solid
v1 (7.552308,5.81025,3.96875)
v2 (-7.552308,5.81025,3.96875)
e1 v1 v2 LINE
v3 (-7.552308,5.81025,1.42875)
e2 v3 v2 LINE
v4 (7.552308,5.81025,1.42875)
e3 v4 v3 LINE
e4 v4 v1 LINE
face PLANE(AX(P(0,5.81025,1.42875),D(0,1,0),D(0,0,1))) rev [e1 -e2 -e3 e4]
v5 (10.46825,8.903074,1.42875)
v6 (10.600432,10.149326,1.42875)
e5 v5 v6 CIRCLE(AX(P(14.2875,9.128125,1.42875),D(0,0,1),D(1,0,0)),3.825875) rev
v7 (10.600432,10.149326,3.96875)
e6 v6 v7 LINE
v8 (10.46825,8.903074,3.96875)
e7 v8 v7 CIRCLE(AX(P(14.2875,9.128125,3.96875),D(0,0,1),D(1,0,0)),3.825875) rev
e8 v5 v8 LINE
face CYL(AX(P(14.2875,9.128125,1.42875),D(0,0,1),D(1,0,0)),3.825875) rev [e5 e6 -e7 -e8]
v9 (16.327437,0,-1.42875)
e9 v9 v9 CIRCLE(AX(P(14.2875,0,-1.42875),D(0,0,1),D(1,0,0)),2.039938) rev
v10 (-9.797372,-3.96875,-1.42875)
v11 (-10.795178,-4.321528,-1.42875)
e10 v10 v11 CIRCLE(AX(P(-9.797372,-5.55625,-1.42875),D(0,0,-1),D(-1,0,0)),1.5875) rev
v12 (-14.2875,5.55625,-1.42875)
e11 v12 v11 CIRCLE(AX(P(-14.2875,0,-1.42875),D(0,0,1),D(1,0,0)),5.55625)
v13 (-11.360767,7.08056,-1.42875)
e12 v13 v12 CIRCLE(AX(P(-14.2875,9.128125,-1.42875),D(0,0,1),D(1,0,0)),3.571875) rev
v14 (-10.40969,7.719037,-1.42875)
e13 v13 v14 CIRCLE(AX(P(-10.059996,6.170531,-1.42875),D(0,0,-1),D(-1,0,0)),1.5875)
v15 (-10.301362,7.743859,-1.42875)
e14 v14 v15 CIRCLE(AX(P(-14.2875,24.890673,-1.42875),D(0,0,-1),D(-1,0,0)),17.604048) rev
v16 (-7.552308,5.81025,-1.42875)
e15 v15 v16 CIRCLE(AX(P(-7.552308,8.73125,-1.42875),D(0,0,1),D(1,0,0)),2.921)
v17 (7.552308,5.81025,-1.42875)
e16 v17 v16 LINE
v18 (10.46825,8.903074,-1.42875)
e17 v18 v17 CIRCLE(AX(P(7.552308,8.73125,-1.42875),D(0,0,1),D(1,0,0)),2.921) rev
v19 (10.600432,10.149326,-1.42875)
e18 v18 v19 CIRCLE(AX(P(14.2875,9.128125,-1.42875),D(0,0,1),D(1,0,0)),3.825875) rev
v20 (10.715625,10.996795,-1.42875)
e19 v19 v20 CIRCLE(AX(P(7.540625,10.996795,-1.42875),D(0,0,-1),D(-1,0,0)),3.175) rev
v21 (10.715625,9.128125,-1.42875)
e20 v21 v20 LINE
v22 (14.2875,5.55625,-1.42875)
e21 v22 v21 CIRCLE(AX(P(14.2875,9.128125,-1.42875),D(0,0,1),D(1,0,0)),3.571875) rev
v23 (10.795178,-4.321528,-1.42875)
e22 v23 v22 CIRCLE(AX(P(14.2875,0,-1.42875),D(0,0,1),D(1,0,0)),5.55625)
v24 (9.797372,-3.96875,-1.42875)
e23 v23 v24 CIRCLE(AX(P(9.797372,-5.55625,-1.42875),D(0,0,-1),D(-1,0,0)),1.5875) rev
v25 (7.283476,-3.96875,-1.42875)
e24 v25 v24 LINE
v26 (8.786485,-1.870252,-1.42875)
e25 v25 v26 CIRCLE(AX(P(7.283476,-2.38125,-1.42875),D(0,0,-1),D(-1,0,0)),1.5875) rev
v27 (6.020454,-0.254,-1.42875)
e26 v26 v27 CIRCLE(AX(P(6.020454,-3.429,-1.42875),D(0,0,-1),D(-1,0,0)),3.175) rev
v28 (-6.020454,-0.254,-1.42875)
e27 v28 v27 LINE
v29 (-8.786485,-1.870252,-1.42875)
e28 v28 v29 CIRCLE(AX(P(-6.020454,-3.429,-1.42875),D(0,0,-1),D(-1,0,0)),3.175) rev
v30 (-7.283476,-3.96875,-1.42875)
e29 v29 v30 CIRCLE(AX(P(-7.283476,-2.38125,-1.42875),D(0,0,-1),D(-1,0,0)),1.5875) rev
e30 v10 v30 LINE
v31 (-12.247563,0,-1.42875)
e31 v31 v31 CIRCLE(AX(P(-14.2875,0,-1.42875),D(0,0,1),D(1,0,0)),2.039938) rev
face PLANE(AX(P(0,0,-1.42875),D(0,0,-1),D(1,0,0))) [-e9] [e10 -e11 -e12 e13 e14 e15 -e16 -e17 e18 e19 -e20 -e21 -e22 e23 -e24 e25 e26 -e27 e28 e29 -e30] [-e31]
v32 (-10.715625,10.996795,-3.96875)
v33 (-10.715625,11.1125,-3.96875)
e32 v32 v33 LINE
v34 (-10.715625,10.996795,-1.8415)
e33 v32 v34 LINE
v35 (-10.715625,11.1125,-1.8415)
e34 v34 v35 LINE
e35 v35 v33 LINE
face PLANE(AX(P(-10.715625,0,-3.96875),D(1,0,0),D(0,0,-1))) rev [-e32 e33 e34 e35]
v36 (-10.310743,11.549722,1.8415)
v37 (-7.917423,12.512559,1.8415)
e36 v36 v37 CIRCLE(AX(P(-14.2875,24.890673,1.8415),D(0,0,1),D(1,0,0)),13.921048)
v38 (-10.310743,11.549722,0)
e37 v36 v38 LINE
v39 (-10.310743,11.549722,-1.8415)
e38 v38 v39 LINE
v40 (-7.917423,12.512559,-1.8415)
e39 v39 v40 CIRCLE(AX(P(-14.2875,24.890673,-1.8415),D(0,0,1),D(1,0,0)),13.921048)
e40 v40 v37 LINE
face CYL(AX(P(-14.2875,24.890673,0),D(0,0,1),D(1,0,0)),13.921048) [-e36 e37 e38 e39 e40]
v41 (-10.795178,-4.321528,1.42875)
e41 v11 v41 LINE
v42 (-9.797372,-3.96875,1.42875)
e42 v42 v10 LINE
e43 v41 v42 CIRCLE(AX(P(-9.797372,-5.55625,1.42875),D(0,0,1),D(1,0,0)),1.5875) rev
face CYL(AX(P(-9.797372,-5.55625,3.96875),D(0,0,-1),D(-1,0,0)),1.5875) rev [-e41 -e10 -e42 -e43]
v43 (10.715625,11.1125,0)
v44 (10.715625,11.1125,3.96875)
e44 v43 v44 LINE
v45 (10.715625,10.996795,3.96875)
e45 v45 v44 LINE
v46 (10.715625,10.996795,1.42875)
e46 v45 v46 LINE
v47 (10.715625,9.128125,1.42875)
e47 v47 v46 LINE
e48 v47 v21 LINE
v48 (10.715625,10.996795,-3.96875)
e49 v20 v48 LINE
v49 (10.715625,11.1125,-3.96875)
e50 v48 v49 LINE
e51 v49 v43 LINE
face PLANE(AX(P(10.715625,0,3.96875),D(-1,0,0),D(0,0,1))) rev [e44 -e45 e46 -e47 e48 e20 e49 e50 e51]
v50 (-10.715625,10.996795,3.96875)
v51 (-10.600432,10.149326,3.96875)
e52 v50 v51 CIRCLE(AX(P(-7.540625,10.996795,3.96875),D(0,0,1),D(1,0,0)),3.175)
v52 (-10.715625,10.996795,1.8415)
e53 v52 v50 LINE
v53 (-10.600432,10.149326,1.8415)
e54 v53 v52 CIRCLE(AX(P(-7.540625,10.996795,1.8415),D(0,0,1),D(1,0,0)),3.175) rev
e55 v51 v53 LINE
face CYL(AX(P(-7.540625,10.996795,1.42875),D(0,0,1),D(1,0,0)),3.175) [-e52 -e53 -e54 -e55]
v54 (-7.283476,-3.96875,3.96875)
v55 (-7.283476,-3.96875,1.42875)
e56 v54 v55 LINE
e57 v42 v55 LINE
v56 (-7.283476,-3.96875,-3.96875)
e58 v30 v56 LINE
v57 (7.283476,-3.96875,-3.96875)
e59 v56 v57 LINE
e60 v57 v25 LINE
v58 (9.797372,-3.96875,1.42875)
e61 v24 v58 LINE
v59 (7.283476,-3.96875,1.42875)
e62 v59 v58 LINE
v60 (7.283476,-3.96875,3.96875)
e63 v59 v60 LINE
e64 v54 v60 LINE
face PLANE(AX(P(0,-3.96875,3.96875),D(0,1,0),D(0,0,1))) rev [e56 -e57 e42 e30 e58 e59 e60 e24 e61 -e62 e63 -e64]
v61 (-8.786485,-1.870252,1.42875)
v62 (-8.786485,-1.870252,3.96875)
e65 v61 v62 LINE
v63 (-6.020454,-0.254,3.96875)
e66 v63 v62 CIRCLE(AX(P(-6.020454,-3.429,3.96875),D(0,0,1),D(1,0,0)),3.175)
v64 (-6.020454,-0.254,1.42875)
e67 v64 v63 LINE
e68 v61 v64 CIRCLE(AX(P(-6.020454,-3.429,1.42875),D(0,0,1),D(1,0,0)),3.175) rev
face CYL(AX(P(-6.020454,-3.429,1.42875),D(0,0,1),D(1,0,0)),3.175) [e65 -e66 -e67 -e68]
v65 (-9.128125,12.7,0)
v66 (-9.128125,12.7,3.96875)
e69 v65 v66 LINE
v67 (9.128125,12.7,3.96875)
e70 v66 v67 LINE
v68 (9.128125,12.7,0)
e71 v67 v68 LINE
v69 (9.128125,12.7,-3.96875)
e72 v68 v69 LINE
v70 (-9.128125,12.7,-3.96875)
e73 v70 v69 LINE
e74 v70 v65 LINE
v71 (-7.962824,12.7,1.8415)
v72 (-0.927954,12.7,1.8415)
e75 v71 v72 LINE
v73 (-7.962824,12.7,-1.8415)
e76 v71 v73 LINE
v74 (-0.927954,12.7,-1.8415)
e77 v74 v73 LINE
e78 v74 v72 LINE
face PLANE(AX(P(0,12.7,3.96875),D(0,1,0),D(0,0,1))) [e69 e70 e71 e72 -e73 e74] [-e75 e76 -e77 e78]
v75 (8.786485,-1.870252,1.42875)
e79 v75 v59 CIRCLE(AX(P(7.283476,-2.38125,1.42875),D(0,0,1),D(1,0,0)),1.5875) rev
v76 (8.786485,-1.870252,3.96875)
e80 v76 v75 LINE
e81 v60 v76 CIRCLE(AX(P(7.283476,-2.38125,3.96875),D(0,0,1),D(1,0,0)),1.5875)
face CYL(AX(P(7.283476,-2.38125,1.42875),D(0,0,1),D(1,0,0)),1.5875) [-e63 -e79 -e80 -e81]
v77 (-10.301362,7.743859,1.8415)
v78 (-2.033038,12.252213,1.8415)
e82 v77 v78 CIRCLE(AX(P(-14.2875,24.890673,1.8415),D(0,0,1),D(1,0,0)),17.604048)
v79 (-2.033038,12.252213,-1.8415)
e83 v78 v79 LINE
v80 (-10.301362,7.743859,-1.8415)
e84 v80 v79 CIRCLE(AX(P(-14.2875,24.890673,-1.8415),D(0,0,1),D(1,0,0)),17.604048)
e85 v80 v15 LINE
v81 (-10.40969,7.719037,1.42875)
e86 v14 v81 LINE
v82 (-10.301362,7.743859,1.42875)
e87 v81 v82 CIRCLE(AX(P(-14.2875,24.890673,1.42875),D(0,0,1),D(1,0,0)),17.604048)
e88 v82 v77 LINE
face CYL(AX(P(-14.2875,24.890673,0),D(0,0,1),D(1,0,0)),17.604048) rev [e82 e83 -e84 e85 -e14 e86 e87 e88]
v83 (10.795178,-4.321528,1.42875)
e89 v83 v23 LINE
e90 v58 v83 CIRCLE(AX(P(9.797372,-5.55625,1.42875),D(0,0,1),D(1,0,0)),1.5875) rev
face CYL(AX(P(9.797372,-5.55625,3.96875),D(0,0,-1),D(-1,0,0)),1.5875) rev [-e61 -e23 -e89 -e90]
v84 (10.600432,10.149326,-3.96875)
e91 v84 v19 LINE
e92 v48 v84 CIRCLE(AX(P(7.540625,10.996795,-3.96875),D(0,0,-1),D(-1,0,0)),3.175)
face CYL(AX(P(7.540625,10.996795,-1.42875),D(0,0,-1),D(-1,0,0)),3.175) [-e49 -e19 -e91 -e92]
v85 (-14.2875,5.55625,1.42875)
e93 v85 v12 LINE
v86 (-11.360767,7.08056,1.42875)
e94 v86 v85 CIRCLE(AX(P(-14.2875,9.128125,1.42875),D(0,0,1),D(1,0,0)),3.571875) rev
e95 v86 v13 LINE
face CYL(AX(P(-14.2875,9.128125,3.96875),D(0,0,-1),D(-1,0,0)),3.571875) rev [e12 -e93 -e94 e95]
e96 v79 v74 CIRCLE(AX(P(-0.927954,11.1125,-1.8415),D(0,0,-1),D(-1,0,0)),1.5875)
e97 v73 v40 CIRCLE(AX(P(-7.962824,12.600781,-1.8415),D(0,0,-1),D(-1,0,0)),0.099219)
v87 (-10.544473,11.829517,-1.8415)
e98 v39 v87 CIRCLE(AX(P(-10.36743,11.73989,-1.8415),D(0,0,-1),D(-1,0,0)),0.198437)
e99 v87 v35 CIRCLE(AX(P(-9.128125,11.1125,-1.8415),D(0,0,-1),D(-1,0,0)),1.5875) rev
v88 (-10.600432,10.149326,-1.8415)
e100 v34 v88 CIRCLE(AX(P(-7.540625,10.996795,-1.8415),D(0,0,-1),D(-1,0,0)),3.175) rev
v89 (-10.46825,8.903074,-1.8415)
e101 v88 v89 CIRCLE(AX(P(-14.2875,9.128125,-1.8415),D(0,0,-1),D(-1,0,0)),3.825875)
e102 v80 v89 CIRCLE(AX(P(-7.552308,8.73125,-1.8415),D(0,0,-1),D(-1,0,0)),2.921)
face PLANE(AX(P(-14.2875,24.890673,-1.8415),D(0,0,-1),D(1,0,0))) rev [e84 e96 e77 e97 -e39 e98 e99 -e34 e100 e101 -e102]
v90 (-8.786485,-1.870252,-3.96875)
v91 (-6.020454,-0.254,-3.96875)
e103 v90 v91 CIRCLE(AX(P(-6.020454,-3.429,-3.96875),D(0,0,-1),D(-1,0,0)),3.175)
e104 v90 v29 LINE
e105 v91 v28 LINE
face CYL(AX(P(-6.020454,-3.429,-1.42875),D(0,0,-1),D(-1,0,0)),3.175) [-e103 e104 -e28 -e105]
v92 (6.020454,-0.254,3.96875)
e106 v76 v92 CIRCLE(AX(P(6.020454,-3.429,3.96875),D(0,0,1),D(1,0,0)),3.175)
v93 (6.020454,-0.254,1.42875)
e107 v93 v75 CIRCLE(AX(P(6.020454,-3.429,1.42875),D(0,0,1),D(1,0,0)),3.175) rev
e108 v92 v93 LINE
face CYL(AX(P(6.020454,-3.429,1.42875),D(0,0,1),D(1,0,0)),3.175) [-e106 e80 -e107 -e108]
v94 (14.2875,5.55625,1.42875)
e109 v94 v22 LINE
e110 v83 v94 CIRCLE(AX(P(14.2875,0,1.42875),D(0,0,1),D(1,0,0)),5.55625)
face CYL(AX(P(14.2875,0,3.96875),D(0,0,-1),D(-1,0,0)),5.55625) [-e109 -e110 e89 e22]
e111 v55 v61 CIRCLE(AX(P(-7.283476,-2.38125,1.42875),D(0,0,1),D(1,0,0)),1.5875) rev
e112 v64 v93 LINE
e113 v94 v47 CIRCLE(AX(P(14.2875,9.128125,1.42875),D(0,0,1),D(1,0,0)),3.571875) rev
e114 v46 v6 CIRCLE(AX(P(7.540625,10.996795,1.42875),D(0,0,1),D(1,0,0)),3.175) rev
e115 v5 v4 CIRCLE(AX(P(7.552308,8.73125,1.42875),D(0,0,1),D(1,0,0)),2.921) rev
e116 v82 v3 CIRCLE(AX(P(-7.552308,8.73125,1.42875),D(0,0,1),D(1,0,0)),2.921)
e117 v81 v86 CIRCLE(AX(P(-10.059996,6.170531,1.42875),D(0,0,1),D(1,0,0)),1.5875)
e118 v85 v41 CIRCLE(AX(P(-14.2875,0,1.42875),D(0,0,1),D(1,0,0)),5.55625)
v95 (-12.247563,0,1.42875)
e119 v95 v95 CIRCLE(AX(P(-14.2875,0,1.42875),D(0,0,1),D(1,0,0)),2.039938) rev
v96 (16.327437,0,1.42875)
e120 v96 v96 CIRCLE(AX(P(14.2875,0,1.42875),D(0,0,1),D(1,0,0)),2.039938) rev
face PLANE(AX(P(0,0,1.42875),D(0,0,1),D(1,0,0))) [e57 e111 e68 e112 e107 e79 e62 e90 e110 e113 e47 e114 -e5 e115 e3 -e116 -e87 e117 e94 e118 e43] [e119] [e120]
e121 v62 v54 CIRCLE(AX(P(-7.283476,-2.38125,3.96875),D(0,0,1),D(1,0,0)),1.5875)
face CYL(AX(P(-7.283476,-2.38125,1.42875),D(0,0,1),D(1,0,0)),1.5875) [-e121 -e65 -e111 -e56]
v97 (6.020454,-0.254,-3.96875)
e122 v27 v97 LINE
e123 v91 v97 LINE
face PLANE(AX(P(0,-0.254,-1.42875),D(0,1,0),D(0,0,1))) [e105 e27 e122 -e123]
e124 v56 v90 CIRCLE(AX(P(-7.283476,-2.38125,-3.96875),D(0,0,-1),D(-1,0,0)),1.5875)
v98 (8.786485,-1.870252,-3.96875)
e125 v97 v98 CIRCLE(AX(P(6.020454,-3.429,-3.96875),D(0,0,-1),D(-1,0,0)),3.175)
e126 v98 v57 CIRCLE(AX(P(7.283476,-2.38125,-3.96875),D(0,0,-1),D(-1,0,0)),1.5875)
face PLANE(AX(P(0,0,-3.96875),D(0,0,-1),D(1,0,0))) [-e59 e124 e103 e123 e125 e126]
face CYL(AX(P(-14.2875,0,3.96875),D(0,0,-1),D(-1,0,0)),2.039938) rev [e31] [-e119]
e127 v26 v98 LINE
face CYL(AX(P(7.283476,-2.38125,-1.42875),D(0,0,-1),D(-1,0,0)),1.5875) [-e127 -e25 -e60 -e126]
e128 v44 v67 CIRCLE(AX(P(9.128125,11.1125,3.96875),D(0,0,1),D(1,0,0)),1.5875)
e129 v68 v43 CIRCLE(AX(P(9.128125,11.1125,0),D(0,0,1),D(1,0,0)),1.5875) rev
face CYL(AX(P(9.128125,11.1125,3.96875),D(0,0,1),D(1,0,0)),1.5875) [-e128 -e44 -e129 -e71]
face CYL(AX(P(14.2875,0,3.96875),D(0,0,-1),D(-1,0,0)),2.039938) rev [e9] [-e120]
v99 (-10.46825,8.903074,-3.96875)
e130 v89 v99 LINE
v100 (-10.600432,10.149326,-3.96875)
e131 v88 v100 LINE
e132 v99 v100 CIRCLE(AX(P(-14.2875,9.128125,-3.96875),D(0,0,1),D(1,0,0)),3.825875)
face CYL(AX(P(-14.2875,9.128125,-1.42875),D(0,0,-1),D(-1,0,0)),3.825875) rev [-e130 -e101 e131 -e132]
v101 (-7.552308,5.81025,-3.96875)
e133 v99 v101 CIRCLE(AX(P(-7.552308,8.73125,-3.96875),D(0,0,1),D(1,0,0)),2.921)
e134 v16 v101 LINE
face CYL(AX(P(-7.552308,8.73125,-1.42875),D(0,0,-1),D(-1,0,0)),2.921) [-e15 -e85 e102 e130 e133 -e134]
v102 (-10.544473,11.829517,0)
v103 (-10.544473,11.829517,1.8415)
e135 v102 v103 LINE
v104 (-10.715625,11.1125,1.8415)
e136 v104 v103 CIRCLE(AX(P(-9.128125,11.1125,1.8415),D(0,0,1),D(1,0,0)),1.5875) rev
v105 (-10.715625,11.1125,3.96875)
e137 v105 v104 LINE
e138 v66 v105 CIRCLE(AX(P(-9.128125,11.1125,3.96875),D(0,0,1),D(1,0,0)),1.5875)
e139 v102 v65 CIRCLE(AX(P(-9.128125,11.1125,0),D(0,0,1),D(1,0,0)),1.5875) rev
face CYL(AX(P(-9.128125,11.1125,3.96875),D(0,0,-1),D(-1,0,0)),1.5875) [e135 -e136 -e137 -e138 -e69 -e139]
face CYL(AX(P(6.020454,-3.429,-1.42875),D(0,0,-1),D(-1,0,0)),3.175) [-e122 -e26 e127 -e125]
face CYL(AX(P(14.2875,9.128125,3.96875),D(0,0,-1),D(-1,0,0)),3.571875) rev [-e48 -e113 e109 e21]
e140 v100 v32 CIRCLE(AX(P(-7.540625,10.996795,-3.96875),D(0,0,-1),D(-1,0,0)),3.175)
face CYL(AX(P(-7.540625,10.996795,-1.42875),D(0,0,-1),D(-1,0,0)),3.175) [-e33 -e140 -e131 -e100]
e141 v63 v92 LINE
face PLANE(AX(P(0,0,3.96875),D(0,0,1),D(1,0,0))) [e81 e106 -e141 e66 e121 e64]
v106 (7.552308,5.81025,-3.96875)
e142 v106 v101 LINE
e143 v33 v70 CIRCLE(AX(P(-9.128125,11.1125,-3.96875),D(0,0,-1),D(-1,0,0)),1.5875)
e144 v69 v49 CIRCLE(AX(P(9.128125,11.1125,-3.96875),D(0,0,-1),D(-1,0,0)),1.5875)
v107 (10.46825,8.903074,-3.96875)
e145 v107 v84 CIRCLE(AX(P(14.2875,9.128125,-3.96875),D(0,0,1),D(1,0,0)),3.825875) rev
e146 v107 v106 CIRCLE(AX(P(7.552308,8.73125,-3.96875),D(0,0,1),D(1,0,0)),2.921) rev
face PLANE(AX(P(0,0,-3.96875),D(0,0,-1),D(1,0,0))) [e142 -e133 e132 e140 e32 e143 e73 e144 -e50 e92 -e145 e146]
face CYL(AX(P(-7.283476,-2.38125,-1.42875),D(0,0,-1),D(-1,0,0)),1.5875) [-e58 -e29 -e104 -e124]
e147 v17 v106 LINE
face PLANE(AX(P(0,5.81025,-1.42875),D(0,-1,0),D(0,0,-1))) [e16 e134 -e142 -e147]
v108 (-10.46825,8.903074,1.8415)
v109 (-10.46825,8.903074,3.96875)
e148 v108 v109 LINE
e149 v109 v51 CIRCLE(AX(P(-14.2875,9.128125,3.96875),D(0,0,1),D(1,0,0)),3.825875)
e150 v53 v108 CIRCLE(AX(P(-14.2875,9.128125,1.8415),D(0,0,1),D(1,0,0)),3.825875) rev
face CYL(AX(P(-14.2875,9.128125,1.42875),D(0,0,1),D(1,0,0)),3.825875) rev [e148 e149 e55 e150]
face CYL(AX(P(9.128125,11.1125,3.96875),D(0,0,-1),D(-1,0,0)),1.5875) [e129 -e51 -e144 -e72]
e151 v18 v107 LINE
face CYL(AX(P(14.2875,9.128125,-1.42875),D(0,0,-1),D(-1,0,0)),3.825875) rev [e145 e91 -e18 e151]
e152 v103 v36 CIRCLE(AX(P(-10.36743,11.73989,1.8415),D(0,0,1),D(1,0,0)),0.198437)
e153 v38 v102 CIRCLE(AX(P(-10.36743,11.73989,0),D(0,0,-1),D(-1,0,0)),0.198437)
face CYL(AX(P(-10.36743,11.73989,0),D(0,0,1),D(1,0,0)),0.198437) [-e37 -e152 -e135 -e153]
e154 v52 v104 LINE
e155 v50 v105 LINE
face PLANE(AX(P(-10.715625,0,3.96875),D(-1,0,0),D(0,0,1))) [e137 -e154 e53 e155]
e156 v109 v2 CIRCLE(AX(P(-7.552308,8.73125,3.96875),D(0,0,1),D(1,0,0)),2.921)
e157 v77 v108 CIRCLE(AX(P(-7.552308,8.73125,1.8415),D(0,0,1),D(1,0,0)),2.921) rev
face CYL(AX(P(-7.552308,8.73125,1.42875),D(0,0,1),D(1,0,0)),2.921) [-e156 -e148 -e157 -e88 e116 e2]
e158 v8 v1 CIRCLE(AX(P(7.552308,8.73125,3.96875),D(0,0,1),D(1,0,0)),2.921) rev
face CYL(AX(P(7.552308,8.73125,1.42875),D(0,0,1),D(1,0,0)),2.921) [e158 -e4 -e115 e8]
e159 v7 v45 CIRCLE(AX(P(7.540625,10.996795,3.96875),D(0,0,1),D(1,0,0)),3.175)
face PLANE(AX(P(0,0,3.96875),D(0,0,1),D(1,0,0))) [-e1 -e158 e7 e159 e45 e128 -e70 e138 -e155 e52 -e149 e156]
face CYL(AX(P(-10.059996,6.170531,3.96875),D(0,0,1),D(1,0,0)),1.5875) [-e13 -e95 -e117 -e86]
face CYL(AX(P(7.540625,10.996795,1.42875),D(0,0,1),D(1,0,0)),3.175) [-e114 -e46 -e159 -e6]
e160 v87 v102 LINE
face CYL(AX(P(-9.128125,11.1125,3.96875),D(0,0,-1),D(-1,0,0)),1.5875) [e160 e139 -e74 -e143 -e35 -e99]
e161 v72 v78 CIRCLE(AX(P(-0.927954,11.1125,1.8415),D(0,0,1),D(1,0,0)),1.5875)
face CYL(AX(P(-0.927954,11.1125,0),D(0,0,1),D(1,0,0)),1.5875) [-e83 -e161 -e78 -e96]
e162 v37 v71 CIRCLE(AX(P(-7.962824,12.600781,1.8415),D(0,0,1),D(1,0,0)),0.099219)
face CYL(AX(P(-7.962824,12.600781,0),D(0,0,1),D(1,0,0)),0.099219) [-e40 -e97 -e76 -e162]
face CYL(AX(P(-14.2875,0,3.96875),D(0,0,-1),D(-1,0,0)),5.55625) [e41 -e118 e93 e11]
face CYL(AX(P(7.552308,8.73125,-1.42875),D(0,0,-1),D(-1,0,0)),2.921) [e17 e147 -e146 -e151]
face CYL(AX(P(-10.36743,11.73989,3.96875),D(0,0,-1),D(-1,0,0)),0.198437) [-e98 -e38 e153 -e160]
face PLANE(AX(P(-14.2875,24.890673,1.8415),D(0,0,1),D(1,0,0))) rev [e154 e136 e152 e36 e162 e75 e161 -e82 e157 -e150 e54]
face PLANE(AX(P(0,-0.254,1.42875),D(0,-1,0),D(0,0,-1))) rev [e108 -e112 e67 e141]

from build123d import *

# Parameters (mm, degrees)
SKETCH2_R           = 5.556250000000001
SKETCH2_R_2         = 2.039937499999998
BOSS_EXTRUDE1_DEPTH = 3.96875
CUT_EXTRUDE1_START  = -2.54
SKETCH3_R           = 2.039937499999998
CUT_EXTRUDE1_DEPTH  = 2.54
FILLET1_R           = 1.5875
FILLET2_R           = 3.175
CUT_EXTRUDE2_START  = -2.12725
SKETCH4_R           = 17.604048203812315
SKETCH4_R_2         = 13.921048203812312
CUT_EXTRUDE2_DEPTH  = 1.8415
MIRROR1_START       = -3.96875
MIRROR1_DEPTH       = 3.96875
MIRROR1_START_2     = -1.42875
MIRROR1_2_OUTLINE_R = 2.0399375
MIRROR1_2_DEPTH     = 1.42875
MIRROR1_3_DEPTH     = 2.12725
FILLET3_R           = 1.5875
FILLET4_R           = 0.1984375
FILLET5_R           = 0.09921875


with BuildPart() as part:
    # Sketch2 → Boss-Extrude1 (new body)
    # profile 1 of 3: a face of its own
    with BuildSketch(Plane.XY):
        with Locations((-14.2875, 0)):
            Circle(SKETCH2_R)
        with Locations((-14.2875, 0)):
            Circle(SKETCH2_R_2, mode=Mode.SUBTRACT)
    # profile 2 of 3: a face of its own
    with BuildSketch(Plane.XY):
        with Locations((14.2875, 0)):
            Circle(SKETCH2_R)
        with Locations((14.2875, 0)):
            Circle(SKETCH2_R_2, mode=Mode.SUBTRACT)
    # profile 3 of 3: a face of its own
    with BuildSketch(Plane.XY):
        with BuildLine():
            Line((-10.715625, 12.699999999999998), (-10.715625, 9.128124999999997))
            ThreePointArc((-10.715625, 9.128124999999997), (-11.76180296762913, 6.6024279642694665), (-14.28750000475128, 5.556249999999996))
            ThreePointArc((-14.287500004751278, 5.556250000000001), (-10.358637948712076, 3.9288620546475865), (-8.73125, 0))
            ThreePointArc((-8.73125, -1.36e-15), (-9.165110266752894, -2.1524491824952943), (-10.398935033331705, -3.968750000000002))
            Line((-10.398935033331705, -3.9687500000000018), (10.398935033331705, -3.9687500000000018))
            ThreePointArc((10.398935033331703, -3.968750000000001), (9.143412067733138, 2.1000650960402263), (14.287499984624889, 5.556250000000001))
            ThreePointArc((14.287499984624889, 5.556249999999996), (11.761802960513377, 6.60242797138522), (10.715625, 9.128124999999997))
            Line((10.715625, 9.128124999999997), (10.715625, 12.699999999999998))
            Line((10.715625, 12.699999999999998), (0, 12.699999999999998))
            Line((0, 12.699999999999998), (-10.715625, 12.699999999999998))
        make_face()
    extrude(amount=BOSS_EXTRUDE1_DEPTH)

    # Sketch3 → Cut-Extrude1 (cut)
    with BuildSketch(Plane.XY.offset(3.96875).offset(CUT_EXTRUDE1_START)):
        with BuildLine():
            ThreePointArc((-7.552307909198136, 5.810250000000002), (-9.677647571923792, 6.727460510546287), (-10.468249900083975, 8.903073472752357))
            ThreePointArc((-10.468249900083975, 8.903073472752357), (-10.506779246316498, 9.714188220388294), (-10.715624999999989, 10.498901604702587))
            Line((-10.715625, 10.498901604702585), (-10.715625, 9.128124999999997))
            ThreePointArc((-10.715624999999998, 9.128124999999997), (-11.76180296762913, 6.6024279642694665), (-14.28750000475128, 5.556249999999997))
            ThreePointArc((-14.28750000475128, 5.556250000000002), (-19.43158792846333, -2.1000651053569315), (-10.398935033331707, -3.9687500000000058))
            Line((-10.398935033331705, -3.9687500000000018), (-10.043913250562724, -3.9687500000000018))
            ThreePointArc((-10.043913250562714, -3.968750000000039), (-8.931023957684667, -2.251037420968806), (-8.482804567636641, -0.2540000000000033))
            Line((-8.482804567636643, -0.254), (8.482804567636643, -0.254))
            ThreePointArc((8.482804567636641, -0.25399999999999856), (8.93102395768462, -2.2510374209686943), (10.043913250562554, -3.968749999999868))
            Line((10.04391325056251, -3.9687500000000018), (10.398935033331705, -3.9687500000000018))
            ThreePointArc((10.398935033331703, -3.968750000000001), (19.431587932266865, -2.1000650960402254), (14.287499984624894, 5.556250000000003))
            ThreePointArc((14.28749998462489, 5.556249999999997), (11.761802960513378, 6.60242797138522), (10.715625, 9.128124999999997))
            Line((10.715625, 9.128124999999997), (10.715625, 10.498901604702809))
            ThreePointArc((10.715625000000067, 10.498901604702796), (10.506779255556298, 9.71418827999466), (10.468249892987725, 8.903073593179762))
            ThreePointArc((10.468249892987725, 8.90307359317976), (9.6776476133017, 6.727460554434185), (7.552307909198134, 5.810250000000002))
            Line((7.552307909198135, 5.810250000000002), (0, 5.810250000000002))
            Line((0, 5.810250000000002), (-7.552307909198135, 5.810250000000002))
        make_face()
        with Locations((-14.2875, 0)):
            Circle(SKETCH3_R, mode=Mode.SUBTRACT)
        with Locations((14.2875, 0)):
            Circle(SKETCH3_R, mode=Mode.SUBTRACT)
    extrude(amount=CUT_EXTRUDE1_DEPTH, mode=Mode.SUBTRACT)

    # Fillet1
    fillet1_edges = [part.edges().sort_by_distance(p)[0] for p in [
        (-10.715625, 12.699999999999998, 1.984375),
        (10.715625, 12.699999999999998, 1.984375),
        (10.043913250562532, -3.968749999999936, 2.69875),
        (-10.043913250562719, -3.9687500000000204, 2.69875),
    ]]
    fillet(fillet1_edges, radius=FILLET1_R)

    # Fillet2
    # the kernel refuses this fillet: 3.175 mm, written as the material it takes off along each edge
    with BuildSketch(Plane(origin=(10.715625000000033, 10.498901604702802, 1.42875), x_dir=(-0.3129675525717291, -0.9497638185555723, 0), z_dir=(0, 0, 1))) as fillet2_piece_1:
        with BuildLine():
            CenterArc((0.5207906104453346, -3.1713246792527547), FILLET2_R, 92.75711760707199, 15.4810427085975)
            Line((-0.47288136896990385, -0.15582455533881112), (0, 0))
            ThreePointArc((0, 0), (0.1840330456266841, -0.00442876150043089), (0.3680660912533638, 0))
        make_face()
    extrude(amount=3.784734111079021, mode=Mode.SUBTRACT)
    with BuildSketch(Plane(origin=(-10.715624999999994, 10.498901604702585, 1.42875), x_dir=(0.31296755257180836, -0.949763818555546, 0), z_dir=(0, 0, 1))) as fillet2_piece_2:
        with BuildLine():
            CenterArc((0.520790610445383, 3.1713246792527405), FILLET2_R, 251.7618396843257, 15.481042708597613)
            Line((-0.4728813689701088, 0.1558245553388813), (0, 0))
            ThreePointArc((0, 0), (0.18403304562657702, 0.00442876150044717), (0.3680660912531513, -1e-17))
        make_face()
    extrude(amount=3.784734111079562, mode=Mode.SUBTRACT)
    with BuildSketch(Plane(origin=(8.482804567636641, -0.25399999999999934, 1.42875), x_dir=(0.18466066844771437, -0.9828023389921513, 0), z_dir=(0, 0, 1))) as fillet2_piece_3:
        with BuildLine():
            CenterArc((2.665698104684143, -3.006301625224905), FILLET2_R, 108.76131112774725, 60.59733959481885)
            Line((-0.4546993216159375, -2.4200040029034118), (0, 0))
            ThreePointArc((0, 0), (0.8222671445716088, -0.05847794215052012), (1.644534289143218, 1e-17))
        make_face()
    extrude(amount=8.695876687740405, mode=Mode.SUBTRACT)
    with BuildSketch(Plane(origin=(-8.482804567636641, -0.2540000000000016, 1.42875), x_dir=(1, 6.5e-16, 0), z_dir=(0, 0, 1))) as fillet2_piece_4:
        with BuildLine():
            CenterArc((2.462350675096158, -3.175), FILLET2_R, 89.99999999999996, 60.59733959481888)
            ThreePointArc((-0.3036808011183762, -1.6162521459227466), (-0.09436814223421007, -0.8189246488483356), (0, 0))
            Line((0, 0), (2.46235067509616, 0))
        make_face()
    extrude(amount=8.695876687740402, mode=Mode.SUBTRACT)

    # Sketch4 → Cut-Extrude2 (cut)
    with BuildSketch(Plane.XY.offset(3.96875).offset(CUT_EXTRUDE2_START)):
        with Locations((-14.2875, 24.89067320381231)):
            Circle(SKETCH4_R)
        with Locations((-14.2875, 24.89067320381231)):
            Circle(SKETCH4_R_2, mode=Mode.SUBTRACT)
    extrude(amount=-CUT_EXTRUDE2_DEPTH, mode=Mode.SUBTRACT)

    # Mirror1: read off the stored shape, not the designer's step
    # Mirror1 outline → Mirror1 (add)
    with BuildSketch(Plane.XY.offset(MIRROR1_START)):
        with BuildLine():
            ThreePointArc((-1.5875, 12.7), (-5.58418864, 9.588552941), (-10.301362468, 7.743859484))
            ThreePointArc((-10.301362468, 7.743859484), (-9.232794937, 6.342065129), (-7.552307909, 5.81025))
            Line((-7.552307909, 5.81025), (7.552307909, 5.81025))
            ThreePointArc((7.552307909, 5.81025), (9.677647591, 6.727460531), (10.468249897, 8.903073529))
            ThreePointArc((10.468249897, 8.903073529), (10.482964805, 9.531648806), (10.600432256, 10.149325748))
            ThreePointArc((10.600432256, 10.149325748), (10.686695012, 10.569164005), (10.715625, 10.996795249))
            Line((10.715625, 10.996795249), (10.715625, 11.1125))
            ThreePointArc((10.715625, 11.1125), (10.250657015, 12.235032015), (9.128125, 12.7))
            Line((9.128125, 12.7), (-1.5875, 12.7))
        make_face()
        with BuildLine():
            ThreePointArc((-8.786485369, -1.870252146), (-8.5740892, -3.3056274), (-7.283475907, -3.96875))
            Line((-7.283475907, -3.96875), (7.283475907, -3.96875))
            ThreePointArc((7.283475907, -3.96875), (8.5740892, -3.3056274), (8.786485369, -1.870252146))
            ThreePointArc((8.786485369, -1.870252146), (7.622265455, -0.687681938), (6.020453893, -0.254))
            Line((6.020453893, -0.254), (-6.020453893, -0.254))
            ThreePointArc((-6.020453893, -0.254), (-7.622265455, -0.687681938), (-8.786485369, -1.870252146))
        make_face()
        with BuildLine():
            ThreePointArc((-10.680399967, 11.445063792), (-9.085054176, 11.978270618), (-7.56566469, 12.7))
            Line((-7.56566469, 12.7), (-9.128125, 12.7))
            ThreePointArc((-9.128125, 12.7), (-10.126175908, 12.347024457), (-10.680399967, 11.445063792))
        make_face()
    extrude(amount=MIRROR1_DEPTH)

    # Mirror1 2 outline → Mirror1 2 (add)
    with BuildSketch(Plane.XY.offset(MIRROR1_START_2)):
        with BuildLine():
            ThreePointArc((-10.301362468, 7.743859484), (-10.683167713, 7.659558848), (-11.066751055, 7.583758707))
            ThreePointArc((-11.066751055, 7.583758707), (-12.384606458, 6.105330402), (-14.2875, 5.55625))
            ThreePointArc((-14.2875, 5.55625), (-19.431587929, -2.100065103), (-10.398935033, -3.96875))
            Line((-10.398935033, -3.96875), (-7.283475907, -3.96875))
            ThreePointArc((-7.283475907, -3.96875), (-8.5740892, -3.3056274), (-8.786485369, -1.870252146))
            ThreePointArc((-8.786485369, -1.870252146), (-7.622265455, -0.687681938), (-6.020453893, -0.254))
            Line((-6.020453893, -0.254), (6.020453893, -0.254))
            ThreePointArc((6.020453893, -0.254), (7.622265455, -0.687681938), (8.786485369, -1.870252146))
            ThreePointArc((8.786485369, -1.870252146), (8.5740892, -3.3056274), (7.283475907, -3.96875))
            Line((7.283475907, -3.96875), (10.398935033, -3.96875))
            ThreePointArc((10.398935033, -3.96875), (19.431587929, -2.100065103), (14.2875, 5.55625))
            ThreePointArc((14.2875, 5.55625), (11.761802966, 6.602427966), (10.715625, 9.128125))
            Line((10.715625, 9.128125), (10.715625, 10.996795249))
            ThreePointArc((10.715625, 10.996795249), (10.686695012, 10.569164005), (10.600432256, 10.149325748))
            ThreePointArc((10.600432256, 10.149325748), (10.482964805, 9.531648806), (10.468249897, 8.903073529))
            ThreePointArc((10.468249897, 8.903073529), (9.677647591, 6.727460531), (7.552307909, 5.81025))
            Line((7.552307909, 5.81025), (-7.552307909, 5.81025))
            ThreePointArc((-7.552307909, 5.81025), (-9.232794937, 6.342065129), (-10.301362468, 7.743859484))
        make_face()
        with Locations((-14.2875, 0)):
            Circle(MIRROR1_2_OUTLINE_R, mode=Mode.SUBTRACT)
        with Locations((14.2875, 0)):
            Circle(MIRROR1_2_OUTLINE_R, mode=Mode.SUBTRACT)
    extrude(amount=MIRROR1_2_DEPTH)

    # Mirror1 3 outline → Mirror1 3 (add)
    with BuildSketch(Plane.XY.offset(MIRROR1_START)):
        with BuildLine():
            ThreePointArc((-10.468249897, 8.903073529), (-10.443499838, 8.315016615), (-10.301362468, 7.743859484))
            ThreePointArc((-10.301362468, 7.743859484), (-5.58418864, 9.588552941), (-1.5875, 12.7))
            Line((-1.5875, 12.7), (-7.56566469, 12.7))
            ThreePointArc((-7.56566469, 12.7), (-9.085054176, 11.978270618), (-10.680399967, 11.445063792))
            ThreePointArc((-10.680399967, 11.445063792), (-10.70679418, 11.27971205), (-10.715625, 11.1125))
            Line((-10.715625, 11.1125), (-10.715625, 10.996795249))
            ThreePointArc((-10.715625, 10.996795249), (-10.686695012, 10.569164005), (-10.600432256, 10.149325748))
            ThreePointArc((-10.600432256, 10.149325748), (-10.482964805, 9.531648806), (-10.468249897, 8.903073529))
        make_face()
    extrude(amount=MIRROR1_3_DEPTH)

    # Fillet3
    fillet3_edges = [part.edges().sort_by_distance(p)[0] for p in [
        (-1.5875000000000001, 12.7, -0.92075),
        (-11.0667510545982, 7.583758707206023, 0.714375),
        (10.398935033331703, -3.9687500000000013, 0.714375),
        (-10.398935033331705, -3.9687500000000018, 0.714375),
    ]]
    fillet(fillet3_edges, radius=FILLET3_R)

    # Fillet4
    # the kernel refuses this fillet: 0.1984375 mm, written as the material it takes off along each edge
    with BuildSketch(Plane(origin=(-10.680399967281256, 11.445063792304536, 0), x_dir=(0.9621801124041967, 0.2724140805719251, 0), z_dir=(0, 0, 1))) as fillet4_piece_1:
        with BuildLine():
            CenterArc((0.38144862686573777, 0.1984186072365745), FILLET4_R, 137.3415044379145, 133.4491322184)
            ThreePointArc((0.2355165674481968, 0.3328852404226754), (0.10702546563184087, 0.17403609738966894), (0, 0))
            ThreePointArc((0, 0), (0.1920934106306479, -0.00132538996079977), (0.384186821261299, 0))
        make_face()
    extrude(amount=1.8415, mode=Mode.SUBTRACT)
    with BuildSketch(Plane(origin=(-10.680399967, 11.445063791999997, -1.8415), x_dir=(0.962180112277252, 0.2724140810203004, 0), z_dir=(0, 0, 1))) as fillet4_piece_2:
        with BuildLine():
            CenterArc((0.3814486268633621, 0.19841860723671206), FILLET4_R, 137.34150443483912, 133.44913221859187)
            ThreePointArc((0.23551656745303873, 0.3328852404306458), (0.10702546562937841, 0.17403609739708187), (0, 0))
            ThreePointArc((0, 0), (0.19209341062446852, -0.00132538995592385), (0.38418682124893766, 1e-17))
        make_face()
    extrude(amount=1.8415, mode=Mode.SUBTRACT)

    # Fillet5
    fillet5_edges = [part.edges().sort_by_distance(p)[0] for p in [
        (-7.565664690300835, 12.699999999999998, 0.92075),
    ]]
    fillet(fillet5_edges, radius=FILLET5_R)


solid = part.part
